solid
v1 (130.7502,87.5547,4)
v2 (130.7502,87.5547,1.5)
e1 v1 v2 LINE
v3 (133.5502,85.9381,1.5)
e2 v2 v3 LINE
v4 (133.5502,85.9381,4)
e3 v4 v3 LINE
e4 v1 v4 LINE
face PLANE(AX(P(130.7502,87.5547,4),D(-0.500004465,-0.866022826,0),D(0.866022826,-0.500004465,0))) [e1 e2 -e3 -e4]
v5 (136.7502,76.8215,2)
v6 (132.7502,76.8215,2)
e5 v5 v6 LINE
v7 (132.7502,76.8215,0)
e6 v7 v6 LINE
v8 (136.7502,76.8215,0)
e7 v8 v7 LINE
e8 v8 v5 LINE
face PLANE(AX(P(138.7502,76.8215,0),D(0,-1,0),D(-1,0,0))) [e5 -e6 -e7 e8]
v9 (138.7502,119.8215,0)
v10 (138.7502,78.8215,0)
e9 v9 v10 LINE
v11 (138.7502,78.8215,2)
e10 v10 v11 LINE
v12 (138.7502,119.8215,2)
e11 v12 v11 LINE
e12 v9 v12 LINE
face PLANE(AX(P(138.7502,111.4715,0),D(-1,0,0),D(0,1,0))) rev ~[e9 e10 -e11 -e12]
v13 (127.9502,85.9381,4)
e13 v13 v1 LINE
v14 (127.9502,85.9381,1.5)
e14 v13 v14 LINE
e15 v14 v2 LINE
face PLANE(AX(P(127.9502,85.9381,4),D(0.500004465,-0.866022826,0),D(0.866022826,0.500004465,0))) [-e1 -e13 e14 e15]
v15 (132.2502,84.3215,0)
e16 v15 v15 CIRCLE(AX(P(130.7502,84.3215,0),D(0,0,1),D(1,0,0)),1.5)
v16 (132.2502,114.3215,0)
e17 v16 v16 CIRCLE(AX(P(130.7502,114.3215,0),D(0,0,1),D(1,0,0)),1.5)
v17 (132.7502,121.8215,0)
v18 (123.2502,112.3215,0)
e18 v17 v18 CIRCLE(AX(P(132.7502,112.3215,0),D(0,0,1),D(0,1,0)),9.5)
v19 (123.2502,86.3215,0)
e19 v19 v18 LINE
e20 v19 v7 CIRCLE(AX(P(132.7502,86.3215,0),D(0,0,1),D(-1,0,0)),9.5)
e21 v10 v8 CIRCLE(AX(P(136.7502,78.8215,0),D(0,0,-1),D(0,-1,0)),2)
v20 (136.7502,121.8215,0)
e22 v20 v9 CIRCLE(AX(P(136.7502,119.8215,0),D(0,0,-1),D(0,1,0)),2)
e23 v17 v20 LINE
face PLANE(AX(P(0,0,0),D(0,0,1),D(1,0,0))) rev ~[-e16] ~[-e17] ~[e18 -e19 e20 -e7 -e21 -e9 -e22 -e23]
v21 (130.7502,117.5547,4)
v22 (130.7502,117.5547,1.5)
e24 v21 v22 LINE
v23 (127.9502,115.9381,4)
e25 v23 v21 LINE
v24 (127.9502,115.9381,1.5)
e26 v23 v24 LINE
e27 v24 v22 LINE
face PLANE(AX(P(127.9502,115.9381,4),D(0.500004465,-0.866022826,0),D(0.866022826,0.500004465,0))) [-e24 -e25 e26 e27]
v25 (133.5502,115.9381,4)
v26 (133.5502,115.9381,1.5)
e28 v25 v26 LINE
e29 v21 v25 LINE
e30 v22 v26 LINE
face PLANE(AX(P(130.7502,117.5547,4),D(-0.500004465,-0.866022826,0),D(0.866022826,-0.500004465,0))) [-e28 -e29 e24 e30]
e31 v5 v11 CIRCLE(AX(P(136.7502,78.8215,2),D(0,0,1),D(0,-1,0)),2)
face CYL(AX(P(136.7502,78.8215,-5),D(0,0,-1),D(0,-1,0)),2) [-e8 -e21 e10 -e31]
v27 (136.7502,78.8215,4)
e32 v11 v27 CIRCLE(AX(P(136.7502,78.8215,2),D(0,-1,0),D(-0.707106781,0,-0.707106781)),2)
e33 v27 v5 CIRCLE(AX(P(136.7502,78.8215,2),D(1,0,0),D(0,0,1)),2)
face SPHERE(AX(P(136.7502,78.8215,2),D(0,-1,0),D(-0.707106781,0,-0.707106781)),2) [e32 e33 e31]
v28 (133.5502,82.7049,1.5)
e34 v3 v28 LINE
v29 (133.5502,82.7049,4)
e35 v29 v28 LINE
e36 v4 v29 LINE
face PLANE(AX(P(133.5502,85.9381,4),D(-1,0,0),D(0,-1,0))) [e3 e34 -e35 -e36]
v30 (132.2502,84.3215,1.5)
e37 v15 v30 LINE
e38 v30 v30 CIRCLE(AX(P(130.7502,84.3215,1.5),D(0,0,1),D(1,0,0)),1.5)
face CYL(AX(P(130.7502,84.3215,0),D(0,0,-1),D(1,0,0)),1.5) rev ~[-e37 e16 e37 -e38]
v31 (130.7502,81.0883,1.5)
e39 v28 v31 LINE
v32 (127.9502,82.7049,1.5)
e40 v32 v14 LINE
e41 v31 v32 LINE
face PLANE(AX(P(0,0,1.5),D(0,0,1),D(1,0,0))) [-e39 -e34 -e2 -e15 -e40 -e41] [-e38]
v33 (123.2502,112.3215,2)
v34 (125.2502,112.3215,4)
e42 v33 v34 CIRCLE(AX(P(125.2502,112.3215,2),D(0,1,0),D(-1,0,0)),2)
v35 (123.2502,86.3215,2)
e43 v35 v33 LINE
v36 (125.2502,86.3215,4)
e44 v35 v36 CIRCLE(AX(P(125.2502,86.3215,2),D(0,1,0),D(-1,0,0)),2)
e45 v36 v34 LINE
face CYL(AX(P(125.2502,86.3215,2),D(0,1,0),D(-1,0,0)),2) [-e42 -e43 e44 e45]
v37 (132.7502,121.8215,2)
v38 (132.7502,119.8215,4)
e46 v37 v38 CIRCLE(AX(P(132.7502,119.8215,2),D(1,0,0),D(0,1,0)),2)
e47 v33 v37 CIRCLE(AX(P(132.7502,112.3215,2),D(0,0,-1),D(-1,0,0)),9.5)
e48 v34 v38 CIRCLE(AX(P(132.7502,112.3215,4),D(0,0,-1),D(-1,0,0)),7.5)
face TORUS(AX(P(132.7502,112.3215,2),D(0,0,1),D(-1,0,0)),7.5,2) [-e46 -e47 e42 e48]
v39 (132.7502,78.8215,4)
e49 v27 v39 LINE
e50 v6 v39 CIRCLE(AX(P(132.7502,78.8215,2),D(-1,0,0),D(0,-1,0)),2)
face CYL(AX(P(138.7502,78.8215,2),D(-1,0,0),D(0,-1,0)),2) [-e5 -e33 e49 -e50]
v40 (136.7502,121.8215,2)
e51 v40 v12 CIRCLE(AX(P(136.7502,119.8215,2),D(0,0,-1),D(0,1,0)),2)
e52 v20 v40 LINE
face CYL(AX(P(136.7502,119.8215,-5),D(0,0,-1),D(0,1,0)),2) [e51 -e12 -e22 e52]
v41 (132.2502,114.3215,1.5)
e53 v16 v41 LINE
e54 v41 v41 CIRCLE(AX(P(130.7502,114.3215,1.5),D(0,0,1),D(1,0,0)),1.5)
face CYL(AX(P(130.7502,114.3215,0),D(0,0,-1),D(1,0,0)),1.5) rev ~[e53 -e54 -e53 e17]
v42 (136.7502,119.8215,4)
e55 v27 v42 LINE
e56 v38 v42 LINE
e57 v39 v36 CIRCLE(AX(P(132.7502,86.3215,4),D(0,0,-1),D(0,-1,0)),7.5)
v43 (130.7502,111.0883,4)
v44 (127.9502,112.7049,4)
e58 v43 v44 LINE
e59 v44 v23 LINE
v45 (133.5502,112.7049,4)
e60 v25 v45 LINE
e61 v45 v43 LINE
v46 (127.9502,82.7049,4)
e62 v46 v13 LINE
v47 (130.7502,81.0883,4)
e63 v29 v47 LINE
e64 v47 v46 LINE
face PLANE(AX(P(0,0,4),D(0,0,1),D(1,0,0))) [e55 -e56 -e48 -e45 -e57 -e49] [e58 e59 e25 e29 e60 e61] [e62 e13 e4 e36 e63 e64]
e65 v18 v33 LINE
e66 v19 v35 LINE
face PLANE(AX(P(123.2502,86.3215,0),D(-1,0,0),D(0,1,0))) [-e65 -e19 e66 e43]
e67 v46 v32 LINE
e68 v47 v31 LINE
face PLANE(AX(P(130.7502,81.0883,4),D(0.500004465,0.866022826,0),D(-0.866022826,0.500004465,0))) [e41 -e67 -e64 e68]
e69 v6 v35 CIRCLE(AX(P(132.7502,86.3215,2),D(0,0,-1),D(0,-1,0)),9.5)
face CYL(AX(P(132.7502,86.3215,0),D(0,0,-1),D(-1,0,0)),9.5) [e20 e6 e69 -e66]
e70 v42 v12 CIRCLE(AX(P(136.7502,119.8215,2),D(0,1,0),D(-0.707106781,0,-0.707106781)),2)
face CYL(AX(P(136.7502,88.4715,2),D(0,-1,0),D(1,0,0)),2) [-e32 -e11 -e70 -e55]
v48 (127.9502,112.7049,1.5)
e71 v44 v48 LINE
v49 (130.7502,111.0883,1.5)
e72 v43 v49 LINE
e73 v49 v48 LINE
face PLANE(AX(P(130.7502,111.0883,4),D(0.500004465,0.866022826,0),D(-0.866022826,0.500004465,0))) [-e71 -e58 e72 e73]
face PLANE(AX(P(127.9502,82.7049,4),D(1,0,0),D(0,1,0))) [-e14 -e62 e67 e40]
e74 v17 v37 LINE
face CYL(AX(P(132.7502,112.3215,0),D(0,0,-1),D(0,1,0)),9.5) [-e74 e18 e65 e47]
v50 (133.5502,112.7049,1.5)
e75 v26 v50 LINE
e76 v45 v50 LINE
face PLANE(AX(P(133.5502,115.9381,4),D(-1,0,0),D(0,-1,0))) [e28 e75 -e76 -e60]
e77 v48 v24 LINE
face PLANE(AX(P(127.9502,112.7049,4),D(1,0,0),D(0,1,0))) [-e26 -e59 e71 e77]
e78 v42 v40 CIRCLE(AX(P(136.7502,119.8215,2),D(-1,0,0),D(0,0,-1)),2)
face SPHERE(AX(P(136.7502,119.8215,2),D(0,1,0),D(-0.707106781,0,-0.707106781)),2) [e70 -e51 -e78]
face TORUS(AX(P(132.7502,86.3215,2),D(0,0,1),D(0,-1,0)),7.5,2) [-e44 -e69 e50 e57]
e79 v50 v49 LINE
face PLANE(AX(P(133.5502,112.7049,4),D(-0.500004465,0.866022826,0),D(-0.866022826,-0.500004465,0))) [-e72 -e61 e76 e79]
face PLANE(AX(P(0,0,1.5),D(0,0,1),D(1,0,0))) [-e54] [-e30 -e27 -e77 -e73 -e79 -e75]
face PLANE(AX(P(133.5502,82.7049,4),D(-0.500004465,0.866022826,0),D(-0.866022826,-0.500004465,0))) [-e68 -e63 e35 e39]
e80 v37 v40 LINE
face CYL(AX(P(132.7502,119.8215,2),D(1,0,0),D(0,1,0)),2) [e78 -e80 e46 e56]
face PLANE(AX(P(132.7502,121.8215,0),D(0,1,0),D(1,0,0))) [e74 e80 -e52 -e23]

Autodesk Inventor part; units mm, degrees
ref_plane "YZ Plane" through (0, 0, 0) normal (1, 0, 0) x (0, 1, 0)
ref_plane "XZ Plane" through (0, 0, 0) normal (0, 1, 0) x (-1, 0, 0)
ref_plane "XY Plane" through (0, 0, 0) normal (0, 0, 1) x (1, 0, 0)
sketch "Эскиз1" plane through (0, 0, 0) normal (0, 0, 1) x (1, 0, 0)
  line L0 (123.2502, 86.3215) -> (123.2502, 112.3215) projected
  circle A0 centre (130.7502, 114.3215) radius 1.5 projected
  circle A1 centre (130.7502, 84.3215) radius 1.5 projected
  line L1 (132.7502, 121.8215) -> (144.7502, 121.8215) projected
  arc A2 (132.7502, 121.8215) -> (123.2502, 112.3215) centre (132.7502, 112.3215) ccw projected
  arc A3 (123.2502, 86.3215) -> (132.7502, 76.8215) centre (132.7502, 86.3215) ccw projected
  line L2 (138.7502, 76.8215) -> (132.7502, 76.8215) projected
  line L3 (138.7502, 88.4715) -> (138.7502, 76.8215) projected
  line L4 (138.7502, 111.4715) -> (138.7502, 98.6715) projected
  line L5 (144.5002, -126.5097) -> (144.5002, 144.1144) projected
  line L6 (138.7502, 76.8215) -> (138.7502, 121.8215)
  point P0 (0, 0)
extrude "Выдавливание1" add sketch "Эскиз1" along normal blind 4
fillet "Сопряжение1" radius 2 6 edges at (123.2502, 99.3215, 4) (126.0327, 79.604, 4) (135.7502, 76.8215, 4) (135.7502, 121.8215, 4) (126.0327, 119.039, 4) (138.7502, 99.3215, 4)
fillet "Сопряжение2" radius 2 4 edges at (138.7502, 121.8215, 1) (138.1644, 121.2357, 3.4142) (138.7502, 76.8215, 1) (138.1644, 77.4073, 3.4142)
sketch "Эскиз2" plane through (0, 0, 4) normal (0, 0, 1) x (1, 0, 0)
  circle A0 centre (130.7502, 114.3215) radius 1.5 projected
  line L0 (130.7502, 117.5547) -> (133.5502, 115.9381)
  line L1 (133.5502, 115.9381) -> (133.5502, 112.7049)
  line L2 (133.5502, 112.7049) -> (130.7502, 111.0883)
  line L3 (130.7502, 111.0883) -> (127.9502, 112.7049)
  line L4 (127.9502, 112.7049) -> (127.9502, 115.9381)
  line L5 (127.9502, 115.9381) -> (130.7502, 117.5547)
  circle A1 centre (130.7502, 84.3215) radius 1.5 projected
  line L6 (130.7502, 87.5547) -> (133.5502, 85.9381)
  line L7 (133.5502, 85.9381) -> (133.5502, 82.7049)
  line L8 (133.5502, 82.7049) -> (130.7502, 81.0883)
  line L9 (130.7502, 81.0883) -> (127.9502, 82.7049)
  line L10 (127.9502, 82.7049) -> (127.9502, 85.9381)
  line L11 (127.9502, 85.9381) -> (130.7502, 87.5547)
  point P0 (0, 0)
  dimension "d4" = 3
  dimension "d5" = 5.6
  dimension "d6" = 5.6
extrude "Выдавливание2" cut sketch "Эскиз2" against normal blind 2.5
properties part number "накладка на петлю"
